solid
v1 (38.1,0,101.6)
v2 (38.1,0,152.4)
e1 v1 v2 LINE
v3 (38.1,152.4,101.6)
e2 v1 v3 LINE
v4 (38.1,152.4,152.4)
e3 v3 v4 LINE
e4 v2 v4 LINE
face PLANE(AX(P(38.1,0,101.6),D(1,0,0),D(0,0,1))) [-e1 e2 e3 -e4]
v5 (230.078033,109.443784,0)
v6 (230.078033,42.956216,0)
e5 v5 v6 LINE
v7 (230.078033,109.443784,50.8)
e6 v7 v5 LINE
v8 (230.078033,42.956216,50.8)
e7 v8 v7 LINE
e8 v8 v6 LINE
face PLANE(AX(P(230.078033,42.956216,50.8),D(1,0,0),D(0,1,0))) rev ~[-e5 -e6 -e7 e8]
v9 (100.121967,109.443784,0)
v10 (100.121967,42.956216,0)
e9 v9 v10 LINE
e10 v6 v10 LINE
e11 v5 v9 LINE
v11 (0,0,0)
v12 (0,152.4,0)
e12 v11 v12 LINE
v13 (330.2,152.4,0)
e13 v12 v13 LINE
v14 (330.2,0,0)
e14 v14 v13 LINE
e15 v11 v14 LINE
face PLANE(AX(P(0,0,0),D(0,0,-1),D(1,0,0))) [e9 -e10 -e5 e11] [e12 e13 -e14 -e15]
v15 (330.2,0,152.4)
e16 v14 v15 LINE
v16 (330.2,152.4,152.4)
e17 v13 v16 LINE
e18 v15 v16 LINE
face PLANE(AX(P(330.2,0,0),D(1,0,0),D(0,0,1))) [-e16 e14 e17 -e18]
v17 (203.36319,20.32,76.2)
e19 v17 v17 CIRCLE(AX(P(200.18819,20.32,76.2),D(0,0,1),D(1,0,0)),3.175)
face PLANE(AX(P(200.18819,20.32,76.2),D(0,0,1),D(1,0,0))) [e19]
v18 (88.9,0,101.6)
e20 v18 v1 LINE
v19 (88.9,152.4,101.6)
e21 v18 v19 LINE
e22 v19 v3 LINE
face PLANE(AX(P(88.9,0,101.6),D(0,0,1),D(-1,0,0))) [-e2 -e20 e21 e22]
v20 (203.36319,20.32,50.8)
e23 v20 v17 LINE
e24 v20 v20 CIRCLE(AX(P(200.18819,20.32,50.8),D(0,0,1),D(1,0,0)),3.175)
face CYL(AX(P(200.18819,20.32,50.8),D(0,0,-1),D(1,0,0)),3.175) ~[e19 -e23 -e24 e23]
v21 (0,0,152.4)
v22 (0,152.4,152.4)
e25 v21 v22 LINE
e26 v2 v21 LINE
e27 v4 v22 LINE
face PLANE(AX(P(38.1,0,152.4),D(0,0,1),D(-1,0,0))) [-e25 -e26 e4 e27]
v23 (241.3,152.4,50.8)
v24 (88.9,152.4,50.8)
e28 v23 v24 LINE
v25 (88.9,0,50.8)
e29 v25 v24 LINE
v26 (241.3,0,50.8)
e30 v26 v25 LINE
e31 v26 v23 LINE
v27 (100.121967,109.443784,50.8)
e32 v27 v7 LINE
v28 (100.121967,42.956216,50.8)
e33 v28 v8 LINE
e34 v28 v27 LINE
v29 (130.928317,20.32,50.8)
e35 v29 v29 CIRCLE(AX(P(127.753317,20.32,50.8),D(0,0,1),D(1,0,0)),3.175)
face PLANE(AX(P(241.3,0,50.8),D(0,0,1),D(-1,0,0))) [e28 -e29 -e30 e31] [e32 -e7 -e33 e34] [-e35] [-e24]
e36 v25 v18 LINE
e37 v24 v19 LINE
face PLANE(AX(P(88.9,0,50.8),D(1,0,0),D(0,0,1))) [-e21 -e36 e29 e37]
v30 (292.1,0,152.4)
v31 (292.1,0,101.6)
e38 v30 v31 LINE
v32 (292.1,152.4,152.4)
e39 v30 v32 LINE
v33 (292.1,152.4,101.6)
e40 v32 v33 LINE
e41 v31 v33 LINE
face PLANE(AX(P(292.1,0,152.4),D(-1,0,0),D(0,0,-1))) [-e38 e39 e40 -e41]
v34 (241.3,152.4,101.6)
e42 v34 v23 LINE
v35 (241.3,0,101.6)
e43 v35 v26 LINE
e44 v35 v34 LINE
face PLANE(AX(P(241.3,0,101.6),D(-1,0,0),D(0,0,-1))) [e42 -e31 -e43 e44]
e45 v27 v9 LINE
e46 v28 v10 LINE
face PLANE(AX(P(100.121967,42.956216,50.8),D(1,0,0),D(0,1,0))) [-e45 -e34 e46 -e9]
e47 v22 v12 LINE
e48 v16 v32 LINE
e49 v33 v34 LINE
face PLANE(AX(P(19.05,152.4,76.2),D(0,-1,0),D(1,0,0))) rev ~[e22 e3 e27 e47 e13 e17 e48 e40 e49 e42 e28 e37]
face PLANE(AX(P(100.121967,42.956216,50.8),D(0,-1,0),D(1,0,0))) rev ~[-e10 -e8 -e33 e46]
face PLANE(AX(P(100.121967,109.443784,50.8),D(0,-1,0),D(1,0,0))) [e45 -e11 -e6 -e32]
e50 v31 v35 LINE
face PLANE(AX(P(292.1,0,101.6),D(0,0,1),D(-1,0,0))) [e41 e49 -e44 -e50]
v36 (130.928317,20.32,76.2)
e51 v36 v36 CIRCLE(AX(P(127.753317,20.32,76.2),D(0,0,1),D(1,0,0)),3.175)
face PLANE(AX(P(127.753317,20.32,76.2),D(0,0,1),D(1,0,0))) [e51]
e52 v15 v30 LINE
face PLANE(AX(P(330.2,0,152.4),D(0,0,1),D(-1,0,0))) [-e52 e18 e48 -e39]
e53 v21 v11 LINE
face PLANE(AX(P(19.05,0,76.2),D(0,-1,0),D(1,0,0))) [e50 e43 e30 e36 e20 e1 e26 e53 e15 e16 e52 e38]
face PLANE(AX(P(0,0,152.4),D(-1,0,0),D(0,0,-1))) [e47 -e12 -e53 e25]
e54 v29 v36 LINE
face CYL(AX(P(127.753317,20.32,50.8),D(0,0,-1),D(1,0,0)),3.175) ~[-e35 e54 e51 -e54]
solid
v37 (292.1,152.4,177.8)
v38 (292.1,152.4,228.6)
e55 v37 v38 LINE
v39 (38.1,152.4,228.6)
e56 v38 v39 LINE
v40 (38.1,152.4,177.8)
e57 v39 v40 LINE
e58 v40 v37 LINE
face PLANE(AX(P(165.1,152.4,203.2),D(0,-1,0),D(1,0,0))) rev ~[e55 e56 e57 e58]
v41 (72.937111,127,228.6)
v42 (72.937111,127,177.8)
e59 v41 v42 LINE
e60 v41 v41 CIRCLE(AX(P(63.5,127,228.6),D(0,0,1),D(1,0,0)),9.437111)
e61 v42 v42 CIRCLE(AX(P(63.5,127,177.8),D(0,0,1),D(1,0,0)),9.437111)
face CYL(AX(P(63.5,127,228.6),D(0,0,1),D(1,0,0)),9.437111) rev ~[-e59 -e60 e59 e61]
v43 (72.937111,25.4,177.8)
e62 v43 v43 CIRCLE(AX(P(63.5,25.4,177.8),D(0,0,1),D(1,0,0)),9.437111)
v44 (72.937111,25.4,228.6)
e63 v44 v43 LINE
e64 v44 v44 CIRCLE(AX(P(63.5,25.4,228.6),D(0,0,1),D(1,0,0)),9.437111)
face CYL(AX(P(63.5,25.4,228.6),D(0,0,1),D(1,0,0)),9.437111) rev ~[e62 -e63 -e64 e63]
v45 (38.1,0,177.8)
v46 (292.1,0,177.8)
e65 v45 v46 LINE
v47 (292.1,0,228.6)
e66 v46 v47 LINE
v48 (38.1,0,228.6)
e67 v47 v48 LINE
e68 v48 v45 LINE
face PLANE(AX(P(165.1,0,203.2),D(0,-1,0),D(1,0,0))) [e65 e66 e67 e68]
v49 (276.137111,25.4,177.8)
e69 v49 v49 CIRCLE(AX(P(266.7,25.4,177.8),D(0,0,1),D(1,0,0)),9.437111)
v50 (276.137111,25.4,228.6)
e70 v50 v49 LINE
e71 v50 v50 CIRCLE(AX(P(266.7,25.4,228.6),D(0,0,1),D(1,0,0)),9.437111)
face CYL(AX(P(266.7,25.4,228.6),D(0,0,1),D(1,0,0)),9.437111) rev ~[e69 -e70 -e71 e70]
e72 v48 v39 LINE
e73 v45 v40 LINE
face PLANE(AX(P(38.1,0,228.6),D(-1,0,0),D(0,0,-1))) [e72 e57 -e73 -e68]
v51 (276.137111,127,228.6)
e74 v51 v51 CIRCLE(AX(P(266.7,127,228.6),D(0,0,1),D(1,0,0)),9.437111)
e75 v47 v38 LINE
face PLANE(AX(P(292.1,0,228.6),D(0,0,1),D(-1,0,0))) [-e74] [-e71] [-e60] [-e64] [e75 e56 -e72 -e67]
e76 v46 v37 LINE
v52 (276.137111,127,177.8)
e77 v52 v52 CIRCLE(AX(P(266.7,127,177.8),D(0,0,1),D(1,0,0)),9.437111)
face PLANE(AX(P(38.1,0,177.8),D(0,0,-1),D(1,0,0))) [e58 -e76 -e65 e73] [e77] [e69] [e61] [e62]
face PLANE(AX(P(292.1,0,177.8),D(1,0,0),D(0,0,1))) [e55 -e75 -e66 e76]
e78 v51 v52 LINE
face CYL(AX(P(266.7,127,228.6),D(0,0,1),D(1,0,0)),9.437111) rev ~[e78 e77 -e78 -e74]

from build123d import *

# Parameters (mm, degrees)
F6_W      = 76.2
F6_H      = 50.8
F7_DEPTH  = 152.4
F0_W      = 129.9560666084
F0_H      = 66.4875675201
F1_DEPTH  = 50.801
F9_DEPTH  = 152.4
F2_R      = 3.175
F3_DEPTH  = 25.4
F4_R      = 9.4371110392
F10_DEPTH = 228.601


with BuildPart() as f7:
    # F6 (on Front) → F7 (new body)
    with BuildSketch(Plane.XZ):
        Polygon((0, 152.4), (0, 0), (38.1, 0), (38.1, 101.6), (38.1, 152.4), align=None)
        with Locations((127, 25.4)):
            Rectangle(F6_W, F6_H)
        Polygon((38.1, 101.6), (38.1, 0), (88.9, 0), (88.9, 50.8), (88.9, 101.6), align=None)
        with Locations((203.2, 25.4)):
            Rectangle(F6_W, F6_H)
        Polygon((241.3, 50.8), (241.3, 0), (292.1, 0), (292.1, 101.6), (241.3, 101.6), align=None)
        Polygon((292.1, 101.6), (292.1, 0), (330.2, 0), (330.2, 152.4), (292.1, 152.4), align=None)
    extrude(amount=-F7_DEPTH)

    # F0 (on face) → F1 (cut, through all)
    with BuildSketch(Plane.XY.offset(50.8)):
        with Locations((165.1, 76.2)):
            Rectangle(F0_W, F0_H)
    extrude(amount=-F1_DEPTH, mode=Mode.SUBTRACT)

    # F2 (on face) → F3 (join)
    with BuildSketch(Plane.XY.offset(50.8)):
        with Locations((127.7533173561, 20.32)):
            Circle(F2_R)
        with Locations((200.1881897449, 20.32)):
            Circle(F2_R)
    extrude(amount=F3_DEPTH)


with BuildPart() as f9:
    # F8 (on Front) → F9 (new body)
    with BuildSketch(Plane.XZ):
        Polygon((38.1, 228.6), (38.1, 177.8), (139.7, 177.8), (190.5, 177.8), (292.1, 177.8), (292.1, 228.6), align=None)
    extrude(amount=-F9_DEPTH)

    # F4 (on face) → F10 (cut, through all)
    with BuildSketch(Plane.XY.offset(228.6)):
        with Locations((63.5, 25.4)):
            Circle(F4_R)
        with Locations((63.5, 127)):
            Circle(F4_R)
        with Locations((266.7, 25.4)):
            Circle(F4_R)
        with Locations((266.7, 127)):
            Circle(F4_R)
    extrude(amount=-F10_DEPTH, mode=Mode.SUBTRACT)


solid = Compound([f7.part, f9.part])
